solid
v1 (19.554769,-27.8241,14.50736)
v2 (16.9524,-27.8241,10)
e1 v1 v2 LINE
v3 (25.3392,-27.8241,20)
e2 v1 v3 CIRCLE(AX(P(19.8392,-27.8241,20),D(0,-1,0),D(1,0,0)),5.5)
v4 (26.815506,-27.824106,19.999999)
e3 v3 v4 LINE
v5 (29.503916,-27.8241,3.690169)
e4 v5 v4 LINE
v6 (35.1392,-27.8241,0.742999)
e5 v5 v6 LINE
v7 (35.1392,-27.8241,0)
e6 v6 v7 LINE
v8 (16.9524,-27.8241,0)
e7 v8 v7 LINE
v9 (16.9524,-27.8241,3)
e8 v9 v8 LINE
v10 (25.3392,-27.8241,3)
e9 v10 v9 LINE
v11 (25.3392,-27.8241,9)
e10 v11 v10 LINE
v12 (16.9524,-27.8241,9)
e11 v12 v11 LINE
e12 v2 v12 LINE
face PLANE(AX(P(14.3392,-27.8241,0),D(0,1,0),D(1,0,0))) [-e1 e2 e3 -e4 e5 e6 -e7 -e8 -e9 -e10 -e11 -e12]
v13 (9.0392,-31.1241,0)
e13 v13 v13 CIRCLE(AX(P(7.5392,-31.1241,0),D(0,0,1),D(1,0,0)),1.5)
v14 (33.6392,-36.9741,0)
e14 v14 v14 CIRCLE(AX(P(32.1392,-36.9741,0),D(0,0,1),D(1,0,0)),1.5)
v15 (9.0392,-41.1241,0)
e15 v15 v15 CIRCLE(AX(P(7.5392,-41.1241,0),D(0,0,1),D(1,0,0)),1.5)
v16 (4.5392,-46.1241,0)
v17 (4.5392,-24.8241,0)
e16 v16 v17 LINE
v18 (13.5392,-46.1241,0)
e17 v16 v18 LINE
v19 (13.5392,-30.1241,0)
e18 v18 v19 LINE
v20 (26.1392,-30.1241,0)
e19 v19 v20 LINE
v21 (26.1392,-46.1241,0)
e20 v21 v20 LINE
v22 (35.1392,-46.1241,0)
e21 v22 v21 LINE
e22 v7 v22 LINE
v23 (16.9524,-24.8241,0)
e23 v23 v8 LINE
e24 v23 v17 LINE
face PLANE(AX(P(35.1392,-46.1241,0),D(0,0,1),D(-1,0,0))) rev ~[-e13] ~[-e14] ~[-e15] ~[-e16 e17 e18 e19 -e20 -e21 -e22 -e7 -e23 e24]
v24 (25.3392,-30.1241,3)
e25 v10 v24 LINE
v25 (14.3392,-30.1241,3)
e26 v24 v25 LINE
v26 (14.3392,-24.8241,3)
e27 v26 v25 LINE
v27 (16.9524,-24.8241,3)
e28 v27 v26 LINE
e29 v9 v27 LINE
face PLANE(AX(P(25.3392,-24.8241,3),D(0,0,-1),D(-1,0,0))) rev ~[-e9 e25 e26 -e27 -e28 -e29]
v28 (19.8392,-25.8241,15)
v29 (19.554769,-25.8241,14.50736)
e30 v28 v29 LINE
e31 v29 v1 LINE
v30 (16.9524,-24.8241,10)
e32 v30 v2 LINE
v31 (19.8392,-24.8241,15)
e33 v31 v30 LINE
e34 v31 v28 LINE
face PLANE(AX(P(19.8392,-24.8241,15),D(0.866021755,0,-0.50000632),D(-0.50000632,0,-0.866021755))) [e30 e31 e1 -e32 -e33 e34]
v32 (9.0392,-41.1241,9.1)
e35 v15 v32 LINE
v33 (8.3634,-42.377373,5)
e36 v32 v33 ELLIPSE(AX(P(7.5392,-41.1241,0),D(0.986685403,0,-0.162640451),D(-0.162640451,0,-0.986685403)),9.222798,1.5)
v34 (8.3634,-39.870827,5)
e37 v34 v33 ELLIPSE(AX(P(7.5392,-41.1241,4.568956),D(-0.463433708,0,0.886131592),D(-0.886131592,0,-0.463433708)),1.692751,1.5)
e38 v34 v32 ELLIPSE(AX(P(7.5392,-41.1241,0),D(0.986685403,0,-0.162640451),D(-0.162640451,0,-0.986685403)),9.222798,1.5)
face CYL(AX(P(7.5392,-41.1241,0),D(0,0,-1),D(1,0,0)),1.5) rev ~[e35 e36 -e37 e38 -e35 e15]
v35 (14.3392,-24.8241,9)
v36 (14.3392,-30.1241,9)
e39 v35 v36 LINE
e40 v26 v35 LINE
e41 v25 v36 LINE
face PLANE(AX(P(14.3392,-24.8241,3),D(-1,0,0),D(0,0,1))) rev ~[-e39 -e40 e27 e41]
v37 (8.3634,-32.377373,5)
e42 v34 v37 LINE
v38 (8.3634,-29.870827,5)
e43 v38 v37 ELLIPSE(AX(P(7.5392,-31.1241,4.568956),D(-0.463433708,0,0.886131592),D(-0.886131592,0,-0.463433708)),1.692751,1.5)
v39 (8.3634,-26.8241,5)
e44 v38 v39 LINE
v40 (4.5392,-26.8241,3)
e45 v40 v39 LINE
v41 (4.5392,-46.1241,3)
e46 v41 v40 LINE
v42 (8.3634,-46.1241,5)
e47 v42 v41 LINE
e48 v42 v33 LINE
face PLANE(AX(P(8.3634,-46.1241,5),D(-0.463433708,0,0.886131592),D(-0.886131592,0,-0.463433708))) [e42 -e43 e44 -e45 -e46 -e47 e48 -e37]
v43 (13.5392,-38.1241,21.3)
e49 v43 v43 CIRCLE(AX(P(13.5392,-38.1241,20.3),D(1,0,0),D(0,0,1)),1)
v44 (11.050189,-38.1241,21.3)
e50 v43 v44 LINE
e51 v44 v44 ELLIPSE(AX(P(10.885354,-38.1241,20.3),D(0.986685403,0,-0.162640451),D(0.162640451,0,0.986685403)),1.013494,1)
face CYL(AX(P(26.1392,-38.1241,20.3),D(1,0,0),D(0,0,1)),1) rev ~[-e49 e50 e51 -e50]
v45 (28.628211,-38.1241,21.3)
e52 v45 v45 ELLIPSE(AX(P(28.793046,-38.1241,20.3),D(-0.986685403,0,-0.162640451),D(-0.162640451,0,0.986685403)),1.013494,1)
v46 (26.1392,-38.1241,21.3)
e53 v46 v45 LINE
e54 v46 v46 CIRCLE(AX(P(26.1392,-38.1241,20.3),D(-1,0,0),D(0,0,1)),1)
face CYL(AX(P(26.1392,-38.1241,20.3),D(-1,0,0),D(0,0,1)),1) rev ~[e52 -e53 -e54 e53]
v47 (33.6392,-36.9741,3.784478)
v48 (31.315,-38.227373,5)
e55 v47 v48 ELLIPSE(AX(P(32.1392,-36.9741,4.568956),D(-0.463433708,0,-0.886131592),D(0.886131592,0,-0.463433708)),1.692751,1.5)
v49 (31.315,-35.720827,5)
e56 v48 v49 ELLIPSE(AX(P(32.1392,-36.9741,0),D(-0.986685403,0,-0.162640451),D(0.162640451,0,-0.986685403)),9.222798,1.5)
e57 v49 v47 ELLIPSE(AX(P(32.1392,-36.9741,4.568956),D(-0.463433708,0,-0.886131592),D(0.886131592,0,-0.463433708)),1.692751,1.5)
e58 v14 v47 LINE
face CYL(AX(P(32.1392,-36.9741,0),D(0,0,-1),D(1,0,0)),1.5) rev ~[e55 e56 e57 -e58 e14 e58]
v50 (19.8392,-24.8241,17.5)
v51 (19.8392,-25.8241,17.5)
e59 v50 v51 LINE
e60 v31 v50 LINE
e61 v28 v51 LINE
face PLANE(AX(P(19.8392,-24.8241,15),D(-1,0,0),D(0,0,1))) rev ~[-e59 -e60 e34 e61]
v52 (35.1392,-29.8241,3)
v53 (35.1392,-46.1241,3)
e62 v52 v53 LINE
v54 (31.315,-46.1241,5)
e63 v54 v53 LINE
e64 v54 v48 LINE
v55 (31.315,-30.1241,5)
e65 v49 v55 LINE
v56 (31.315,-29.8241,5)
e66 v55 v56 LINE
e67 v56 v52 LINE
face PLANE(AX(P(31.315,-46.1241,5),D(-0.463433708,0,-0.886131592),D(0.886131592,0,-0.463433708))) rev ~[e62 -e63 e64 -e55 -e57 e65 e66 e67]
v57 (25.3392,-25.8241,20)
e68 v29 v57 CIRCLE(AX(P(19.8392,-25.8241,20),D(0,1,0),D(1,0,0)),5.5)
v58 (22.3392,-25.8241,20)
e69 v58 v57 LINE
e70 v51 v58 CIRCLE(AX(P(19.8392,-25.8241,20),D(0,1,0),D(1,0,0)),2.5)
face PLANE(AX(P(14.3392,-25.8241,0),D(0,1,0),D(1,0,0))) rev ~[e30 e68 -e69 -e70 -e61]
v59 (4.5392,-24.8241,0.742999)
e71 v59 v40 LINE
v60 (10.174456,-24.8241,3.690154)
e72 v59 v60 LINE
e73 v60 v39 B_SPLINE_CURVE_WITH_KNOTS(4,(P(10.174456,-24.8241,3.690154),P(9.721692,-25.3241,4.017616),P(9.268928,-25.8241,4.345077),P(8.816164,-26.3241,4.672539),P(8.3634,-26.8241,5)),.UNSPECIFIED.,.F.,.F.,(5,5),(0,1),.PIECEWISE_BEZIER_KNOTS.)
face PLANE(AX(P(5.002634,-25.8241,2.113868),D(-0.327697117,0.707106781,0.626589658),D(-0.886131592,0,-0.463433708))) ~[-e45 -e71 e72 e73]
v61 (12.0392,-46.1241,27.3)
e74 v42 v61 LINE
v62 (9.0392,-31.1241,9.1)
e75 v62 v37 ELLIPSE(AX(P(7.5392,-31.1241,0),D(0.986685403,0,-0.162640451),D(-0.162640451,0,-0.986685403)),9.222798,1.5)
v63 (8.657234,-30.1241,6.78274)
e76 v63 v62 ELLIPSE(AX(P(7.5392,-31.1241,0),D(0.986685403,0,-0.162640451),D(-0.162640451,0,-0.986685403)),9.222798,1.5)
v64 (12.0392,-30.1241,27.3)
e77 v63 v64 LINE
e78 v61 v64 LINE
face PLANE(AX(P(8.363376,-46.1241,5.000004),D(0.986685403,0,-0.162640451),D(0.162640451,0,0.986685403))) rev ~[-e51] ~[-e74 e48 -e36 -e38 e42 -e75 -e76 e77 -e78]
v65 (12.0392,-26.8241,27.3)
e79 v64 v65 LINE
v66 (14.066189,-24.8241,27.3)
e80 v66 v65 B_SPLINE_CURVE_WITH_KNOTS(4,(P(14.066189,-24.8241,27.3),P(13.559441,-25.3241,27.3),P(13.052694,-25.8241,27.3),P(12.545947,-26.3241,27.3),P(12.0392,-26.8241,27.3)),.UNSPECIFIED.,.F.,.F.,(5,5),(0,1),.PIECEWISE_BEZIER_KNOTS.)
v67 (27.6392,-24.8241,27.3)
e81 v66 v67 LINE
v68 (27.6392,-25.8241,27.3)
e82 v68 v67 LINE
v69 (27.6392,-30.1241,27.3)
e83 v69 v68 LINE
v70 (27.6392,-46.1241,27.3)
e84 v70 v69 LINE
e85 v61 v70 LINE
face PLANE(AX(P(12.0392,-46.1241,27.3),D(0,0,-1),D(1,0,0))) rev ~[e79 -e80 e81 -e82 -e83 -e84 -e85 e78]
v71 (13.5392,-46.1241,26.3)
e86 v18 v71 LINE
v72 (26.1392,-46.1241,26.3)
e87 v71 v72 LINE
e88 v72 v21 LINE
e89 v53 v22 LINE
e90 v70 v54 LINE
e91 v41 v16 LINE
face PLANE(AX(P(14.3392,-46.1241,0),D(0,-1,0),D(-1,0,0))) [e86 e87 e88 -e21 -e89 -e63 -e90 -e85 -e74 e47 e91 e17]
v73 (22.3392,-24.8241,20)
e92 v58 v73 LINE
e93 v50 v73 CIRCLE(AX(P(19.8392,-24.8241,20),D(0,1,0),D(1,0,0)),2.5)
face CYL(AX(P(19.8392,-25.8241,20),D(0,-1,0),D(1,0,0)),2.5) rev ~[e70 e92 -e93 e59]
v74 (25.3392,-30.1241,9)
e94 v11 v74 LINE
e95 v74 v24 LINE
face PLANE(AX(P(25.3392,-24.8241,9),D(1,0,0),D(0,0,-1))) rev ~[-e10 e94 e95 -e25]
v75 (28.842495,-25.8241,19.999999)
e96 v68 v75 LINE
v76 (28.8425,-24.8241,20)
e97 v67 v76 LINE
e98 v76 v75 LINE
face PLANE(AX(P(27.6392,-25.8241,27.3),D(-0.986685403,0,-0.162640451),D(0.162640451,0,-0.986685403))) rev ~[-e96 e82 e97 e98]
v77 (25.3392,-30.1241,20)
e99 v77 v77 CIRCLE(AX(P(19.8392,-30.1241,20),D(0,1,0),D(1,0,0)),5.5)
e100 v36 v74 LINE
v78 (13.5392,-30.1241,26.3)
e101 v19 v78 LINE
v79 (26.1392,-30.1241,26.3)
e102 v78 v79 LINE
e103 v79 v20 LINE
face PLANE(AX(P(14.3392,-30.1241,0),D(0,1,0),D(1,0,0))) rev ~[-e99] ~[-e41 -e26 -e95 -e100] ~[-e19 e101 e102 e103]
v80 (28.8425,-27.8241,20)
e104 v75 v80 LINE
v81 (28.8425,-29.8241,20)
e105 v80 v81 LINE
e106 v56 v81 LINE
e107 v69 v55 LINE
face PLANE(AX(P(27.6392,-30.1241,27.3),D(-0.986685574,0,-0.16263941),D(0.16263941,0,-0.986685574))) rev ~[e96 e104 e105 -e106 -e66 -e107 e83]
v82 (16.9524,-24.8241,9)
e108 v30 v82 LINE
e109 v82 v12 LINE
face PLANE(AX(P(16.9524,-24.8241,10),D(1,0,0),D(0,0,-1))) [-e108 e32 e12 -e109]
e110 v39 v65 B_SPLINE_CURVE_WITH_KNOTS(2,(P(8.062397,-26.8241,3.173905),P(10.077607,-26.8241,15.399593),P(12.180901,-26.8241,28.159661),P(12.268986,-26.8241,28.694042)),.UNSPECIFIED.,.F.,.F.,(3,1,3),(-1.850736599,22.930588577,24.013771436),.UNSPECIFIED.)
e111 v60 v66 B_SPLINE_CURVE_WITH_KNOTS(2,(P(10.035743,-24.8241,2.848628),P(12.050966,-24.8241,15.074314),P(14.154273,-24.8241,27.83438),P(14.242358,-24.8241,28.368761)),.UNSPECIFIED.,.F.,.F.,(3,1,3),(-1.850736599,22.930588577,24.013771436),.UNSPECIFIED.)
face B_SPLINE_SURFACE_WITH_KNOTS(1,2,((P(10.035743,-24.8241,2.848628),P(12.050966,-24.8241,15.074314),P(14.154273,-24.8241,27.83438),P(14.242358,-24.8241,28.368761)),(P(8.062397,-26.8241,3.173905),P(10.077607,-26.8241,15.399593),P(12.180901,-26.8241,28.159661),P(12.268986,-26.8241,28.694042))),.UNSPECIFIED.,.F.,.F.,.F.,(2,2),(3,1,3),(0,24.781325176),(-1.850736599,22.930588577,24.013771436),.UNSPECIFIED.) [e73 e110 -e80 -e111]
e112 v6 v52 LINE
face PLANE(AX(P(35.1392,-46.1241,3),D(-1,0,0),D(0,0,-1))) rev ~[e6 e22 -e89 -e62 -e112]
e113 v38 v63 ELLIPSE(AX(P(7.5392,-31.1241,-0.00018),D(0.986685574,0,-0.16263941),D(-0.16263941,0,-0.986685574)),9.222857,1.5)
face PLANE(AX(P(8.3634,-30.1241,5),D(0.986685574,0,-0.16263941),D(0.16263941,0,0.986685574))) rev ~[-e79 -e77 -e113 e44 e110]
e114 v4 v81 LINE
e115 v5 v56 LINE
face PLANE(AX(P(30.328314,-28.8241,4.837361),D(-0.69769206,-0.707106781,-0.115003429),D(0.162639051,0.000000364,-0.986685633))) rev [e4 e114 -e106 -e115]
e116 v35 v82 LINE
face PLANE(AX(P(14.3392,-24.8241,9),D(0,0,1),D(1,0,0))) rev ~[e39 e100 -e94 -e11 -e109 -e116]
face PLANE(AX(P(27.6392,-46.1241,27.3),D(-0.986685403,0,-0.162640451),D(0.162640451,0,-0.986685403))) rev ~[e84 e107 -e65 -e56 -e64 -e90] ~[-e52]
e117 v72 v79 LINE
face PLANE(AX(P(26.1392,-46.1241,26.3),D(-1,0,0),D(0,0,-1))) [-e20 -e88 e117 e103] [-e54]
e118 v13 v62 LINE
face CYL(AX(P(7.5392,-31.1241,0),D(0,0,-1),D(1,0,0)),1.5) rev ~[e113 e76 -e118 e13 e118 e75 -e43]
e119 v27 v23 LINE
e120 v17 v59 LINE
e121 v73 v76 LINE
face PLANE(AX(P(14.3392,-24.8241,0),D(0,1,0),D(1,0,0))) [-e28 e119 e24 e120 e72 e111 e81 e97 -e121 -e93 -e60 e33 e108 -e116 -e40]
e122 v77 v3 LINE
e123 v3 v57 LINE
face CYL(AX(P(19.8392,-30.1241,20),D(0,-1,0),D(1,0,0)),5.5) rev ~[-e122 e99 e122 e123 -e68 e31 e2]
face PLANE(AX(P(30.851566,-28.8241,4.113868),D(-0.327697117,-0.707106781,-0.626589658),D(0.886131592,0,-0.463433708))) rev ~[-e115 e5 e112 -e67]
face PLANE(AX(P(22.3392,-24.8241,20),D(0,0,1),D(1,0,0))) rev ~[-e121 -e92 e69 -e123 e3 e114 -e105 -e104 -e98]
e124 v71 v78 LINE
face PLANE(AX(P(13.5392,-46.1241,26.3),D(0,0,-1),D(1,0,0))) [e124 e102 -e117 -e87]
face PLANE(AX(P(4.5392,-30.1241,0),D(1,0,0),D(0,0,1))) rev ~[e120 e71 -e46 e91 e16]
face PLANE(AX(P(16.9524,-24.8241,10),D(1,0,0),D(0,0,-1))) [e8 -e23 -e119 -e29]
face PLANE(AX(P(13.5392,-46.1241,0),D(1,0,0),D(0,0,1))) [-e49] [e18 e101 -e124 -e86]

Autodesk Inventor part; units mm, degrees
ref_plane "YZ Plane" through (0, 0, 0) normal (1, 0, 0) x (0, 1, 0)
ref_plane "XZ Plane" through (0, 0, 0) normal (0, 1, 0) x (-1, 0, 0)
ref_plane "XY Plane" through (0, 0, 0) normal (0, 0, 1) x (1, 0, 0)
ref_plane "Work Plane1" through (14.3392, -46.1241, 0) normal (0, -1, 0) x (-1, 0, 0)
sketch "Sketch1" plane through (14.3392, -46.1241, 0) normal (0, -1, 0) x (-1, 0, 0)
  line L0 (-22.1702, 0) -> (47.1015, 0) projected
  line L1 (0.3, -25.8) -> (-11.3, -25.8) construction
  line L2 (-5.5, -25.8) -> (-5.5, 0) construction
  line L3 (0.8, 0) -> (0.8, -26.3)
  line L4 (0.8, -26.3) -> (-11.8, -26.3)
  line L5 (-11.8, -26.3) -> (-11.8, 0)
  line L6 (6.8, 0) -> (2.3, -27.3)
  line L7 (2.3, -27.3) -> (-13.3, -27.3)
  line L8 (-13.3, -27.3) -> (-17.8, 0)
  line L9 (5.9758, -5) -> (9.8, -3)
  line L10 (9.8, -3) -> (9.8, 0)
  line L11 (-16.9758, -5) -> (-20.8, -3)
  line L12 (-20.8, -3) -> (-20.8, 0)
  line L13 (5.9758, -5) -> (-16.9758, -5) construction
  line L14 (9.8, -3) -> (-20.8, -3) construction
  point P0 (14.3392, 0)
  dimension "d0" = 1
  dimension "d1" = 0.5
  dimension "d2" = 0.5
  dimension "d3" = 1.5
  dimension "d4" = 6
  dimension "d24" = 3
  dimension "d25" = 2
  dimension "d26" = 3
  dimension "d27" = 3
extrude "ext_maincage" add sketch "Sketch1" against normal blind 16 contours L0 L8 L11 L12 | L0 L5 L4 L3 L6 L7 L8 | L0 L10 L9 L6
sketch "Sketch2" plane through (14.3392, -30.1241, 0) normal (0, 1, 0) x (1, 0, 0)
  line L0 (-0.8, -26.3) -> (-0.8, 0) projected
  line L1 (-2.3, -27.3) -> (13.3, -27.3) projected
  line L2 (11.8, 0) -> (11.8, -26.3) projected
  line L3 (11.8, -26.3) -> (-0.8, -26.3) projected
  circle A0 centre (5.5, -20) radius 5.5
  circle A1 centre (5.5, -20) radius 7.3
  line L4 (-0.8, 0) -> (-0.8, -16.3122)
  line L5 (-0.8, -23.6878) -> (-0.8, -26.3)
  line L6 (-0.8, -26.3) -> (1.8122, -26.3)
  line L7 (9.1878, -26.3) -> (11.8, -26.3)
  line L8 (11.8, -23.6878) -> (11.8, -26.3)
  line L9 (-0.8, 0) -> (11.8, 0)
  line L10 (11.8, 0) -> (11.8, -16.3122)
  line L11 (-0.8, -16.3122) -> (-0.8, 0)
  line L12 (-0.8, 0) -> (-9.8, 0) projected
  line L13 (-9.8, 0) -> (-9.8, -3) projected
  line L14 (-9.8, -3) -> (-5.9758, -5) projected
  line L15 (-5.9758, -5) -> (-2.3, -27.3) projected
  line L16 (-2.3, -27.3) -> (13.3, -27.3) projected
  line L17 (13.3, -27.3) -> (16.9758, -5) projected
  line L18 (16.9758, -5) -> (20.8, -3) projected
  line L19 (20.8, -3) -> (20.8, 0) projected
  line L20 (20.8, 0) -> (11.8, 0) projected
  line L21 (11.8, 0) -> (11.8, -26.3) projected
  line L22 (11.8, -26.3) -> (-0.8, -26.3) projected
  line L23 (-0.8, -26.3) -> (-0.8, 0) projected
  point P0 (-6.8, 0)
  point P1 (17.8, 0)
  point P2 (-14.3392, 0)
  point P3 (3.5163, -12.9747)
  dimension "d7" = 11
extrude "ext_backhousing" add sketch "Sketch2" along normal blind 4.3
sketch "Sketch3" plane through (14.3392, -25.8241, 0) normal (0, 1, 0) x (1, 0, 0)
  line L0 (17.8, 0) -> (-6.8, 0) projected
  line L1 (-6.8, 0) -> (-2.3, -27.3) projected
  line L2 (-2.3, -27.3) -> (13.3, -27.3) projected
  line L3 (13.3, -27.3) -> (17.8, 0) projected
  circle A0 centre (5.5, -20) radius 2.5
  circle A1 centre (5.5, -20) radius 5.5 projected
  line L4 (20.8, 0) -> (-9.8, 0) projected
  line L5 (-9.8, 0) -> (-9.8, -3) projected
  line L6 (-9.8, -3) -> (-5.9758, -5) projected
  line L7 (-5.9758, -5) -> (-2.3, -27.3) projected
  line L8 (-2.3, -27.3) -> (13.3, -27.3) projected
  line L9 (13.3, -27.3) -> (16.9758, -5) projected
  line L10 (16.9758, -5) -> (20.8, -3) projected
  line L11 (20.8, -3) -> (20.8, 0) projected
  point P0 (-0.8, 0)
  point P1 (-14.3392, 0)
  dimension "d10" = 5
extrude "ext_backcover" add sketch "Sketch3" along normal blind 1 contours L3 L2 L1 L0 | L4 L11 L10 L3 | L1 L6 L5 L4 | A1
sketch "Sketch4" plane through (14.3392, -24.8241, 0) normal (0, 1, 0) x (1, 0, 0)
  circle A0 centre (5.5, -20) radius 2.5 projected
  line L0 (5.5, 0) -> (5.5, -17.5)
  line L1 (5.5, -15) -> (2.6132, -10)
  line L2 (2.6132, -10) -> (2.6132, 0)
  line L3 (20.8, 0) -> (-9.8, 0) projected
  line L4 (13.3, -27.3) -> (16.9758, -5) projected
  line L5 (20.8, -3) -> (20.8, 0) projected
  line L6 (8, -20) -> (14.5033, -20)
  line L7 (-2.3, -27.3) -> (13.3, -27.3) projected
  line L8 (16.9758, -5) -> (20.8, -3) projected
  circle A1 centre (5.5, -20) radius 2.5
  line L9 (14.5643, -19.6299) -> (16.9758, -5)
  line L10 (16.9758, -5) -> (20.8, -3)
  line L11 (20.8, -3) -> (20.8, 0)
  line L12 (20.8, 0) -> (5.5, 0)
  point P0 (-14.3392, 0)
  dimension "d22" = 30
  dimension "d23" = 10
  dimension "d28" = 5
extrude "ext_cut_backcutway" cut sketch "Sketch4" against normal blind 3 contours A0 L0 L3 L5 L8 L4 L6 | L1 L2 L3 L0
chamfer "Chamfer3" distance 2 angle 45 4 edges at (30.0788, -27.8241, 12.5) (33.2272, -27.8241, 4) (6.4513, -24.8241, 4) (10.2013, -24.8241, 16.15)
ref_plane "back_plane" through (14.3392, -24.8241, 0) normal (0, 1, 0) x (1, 0, 0)
sketch "Sketch5" plane through (14.3392, -24.8241, 0) normal (0, 1, 0) x (1, 0, 0)
  line L0 (-0.273, -27.3) -> (13.3, -27.3) projected
  line L1 (2.6132, 0) -> (20.8, 0) projected
  line L2 (11, -9) -> (11, -3)
  line L3 (11, -3) -> (0, -3)
  line L4 (0, -3) -> (0, -9)
  line L5 (0, -9) -> (11, -9)
  line L6 (11, -9) -> (0, -3) construction
  line L7 (11, -3) -> (0, -9) construction
  arc A0 (5.5, -17.5) -> (8, -20) centre (5.5, -20) ccw projected
  line L8 (5.5, -20) -> (5.5, -3) construction
  point P0 (-14.3392, 0)
  point P1 (5.5, -6)
  point P2 (5.5, -6)
  dimension "d33" = 6
  dimension "d34" = 11
  dimension "d37" = 3
extrude "Extrusion5" cut sketch "Sketch5" against normal through all
sketch "Sketch6" plane through (0, 0, 0) normal (0, 0, 1) x (1, 0, 0)
  line L0 (35.1392, -46.1241) -> (35.1392, -27.8241) projected
  circle A0 centre (32.1392, -36.9741) radius 1.5
  line L1 (33.6392, -36.9741) -> (35.1392, -36.9741)
  line L2 (32.1392, -36.9741) -> (33.6392, -36.9741) construction
  line L3 (4.5392, -46.1241) -> (4.5392, -26.8241) projected
  line L4 (4.5392, -46.1241) -> (4.5392, -24.8241) projected
  circle A1 centre (7.5392, -31.1241) radius 1.5
  circle A2 centre (7.5392, -41.1241) radius 1.5
  line L5 (7.5392, -31.1241) -> (7.5392, -41.1241) construction
  line L6 (7.5392, -41.1241) -> (6.0392, -41.1241) construction
  line L7 (7.5392, -31.1241) -> (6.0392, -31.1241) construction
  line L8 (4.5392, -31.1241) -> (6.0392, -31.1241)
  line L9 (4.5392, -41.1241) -> (6.0392, -41.1241)
  line L10 (35.1392, -46.1241) -> (35.1392, -29.8241) projected
  point P0 (0, 0)
  dimension "d38" = 3
  dimension "d40" = 1.5
  dimension "d43" = 10
  dimension "d44" = 5
extrude "Extrusion6" cut sketch "Sketch6" along normal through all
sketch "Sketch7" plane through (26.1392, -46.1241, 0) normal (-1, 0, 0) x (0, 0, 1)
  line L0 (26.3, 0) -> (26.3, 16) projected
  line L1 (0, 0) -> (0, 16) projected
  line L2 (26.3, 8) -> (0, 8) construction
  circle A0 centre (20.3, 8) radius 1
  point P0 (0, 46.1241)
  dimension "d47" = 2
  dimension "d48" = 6
extrude "Extrusion7" cut sketch "Sketch7" along normal through all both and the other way through all
equation "\"d7\" = linact_bearing_diameter"
equation "\"d8\" = linact_bearing_thickness"
equation "\"d38\" = screw_m3_bore_selfthreading"
equation "\"d47\" = screw_m2_bore_selfthreading"
equation "\"linact_bearing_diameter\" = 11"
equation "\"linact_bearing_thickness\" = 4.3"
equation "\"screw_m3_bore_selfthreading\" = 3"
equation "\"screw_m2_bore_selfthreading\" = 2"
properties part number "servo_clamp"
